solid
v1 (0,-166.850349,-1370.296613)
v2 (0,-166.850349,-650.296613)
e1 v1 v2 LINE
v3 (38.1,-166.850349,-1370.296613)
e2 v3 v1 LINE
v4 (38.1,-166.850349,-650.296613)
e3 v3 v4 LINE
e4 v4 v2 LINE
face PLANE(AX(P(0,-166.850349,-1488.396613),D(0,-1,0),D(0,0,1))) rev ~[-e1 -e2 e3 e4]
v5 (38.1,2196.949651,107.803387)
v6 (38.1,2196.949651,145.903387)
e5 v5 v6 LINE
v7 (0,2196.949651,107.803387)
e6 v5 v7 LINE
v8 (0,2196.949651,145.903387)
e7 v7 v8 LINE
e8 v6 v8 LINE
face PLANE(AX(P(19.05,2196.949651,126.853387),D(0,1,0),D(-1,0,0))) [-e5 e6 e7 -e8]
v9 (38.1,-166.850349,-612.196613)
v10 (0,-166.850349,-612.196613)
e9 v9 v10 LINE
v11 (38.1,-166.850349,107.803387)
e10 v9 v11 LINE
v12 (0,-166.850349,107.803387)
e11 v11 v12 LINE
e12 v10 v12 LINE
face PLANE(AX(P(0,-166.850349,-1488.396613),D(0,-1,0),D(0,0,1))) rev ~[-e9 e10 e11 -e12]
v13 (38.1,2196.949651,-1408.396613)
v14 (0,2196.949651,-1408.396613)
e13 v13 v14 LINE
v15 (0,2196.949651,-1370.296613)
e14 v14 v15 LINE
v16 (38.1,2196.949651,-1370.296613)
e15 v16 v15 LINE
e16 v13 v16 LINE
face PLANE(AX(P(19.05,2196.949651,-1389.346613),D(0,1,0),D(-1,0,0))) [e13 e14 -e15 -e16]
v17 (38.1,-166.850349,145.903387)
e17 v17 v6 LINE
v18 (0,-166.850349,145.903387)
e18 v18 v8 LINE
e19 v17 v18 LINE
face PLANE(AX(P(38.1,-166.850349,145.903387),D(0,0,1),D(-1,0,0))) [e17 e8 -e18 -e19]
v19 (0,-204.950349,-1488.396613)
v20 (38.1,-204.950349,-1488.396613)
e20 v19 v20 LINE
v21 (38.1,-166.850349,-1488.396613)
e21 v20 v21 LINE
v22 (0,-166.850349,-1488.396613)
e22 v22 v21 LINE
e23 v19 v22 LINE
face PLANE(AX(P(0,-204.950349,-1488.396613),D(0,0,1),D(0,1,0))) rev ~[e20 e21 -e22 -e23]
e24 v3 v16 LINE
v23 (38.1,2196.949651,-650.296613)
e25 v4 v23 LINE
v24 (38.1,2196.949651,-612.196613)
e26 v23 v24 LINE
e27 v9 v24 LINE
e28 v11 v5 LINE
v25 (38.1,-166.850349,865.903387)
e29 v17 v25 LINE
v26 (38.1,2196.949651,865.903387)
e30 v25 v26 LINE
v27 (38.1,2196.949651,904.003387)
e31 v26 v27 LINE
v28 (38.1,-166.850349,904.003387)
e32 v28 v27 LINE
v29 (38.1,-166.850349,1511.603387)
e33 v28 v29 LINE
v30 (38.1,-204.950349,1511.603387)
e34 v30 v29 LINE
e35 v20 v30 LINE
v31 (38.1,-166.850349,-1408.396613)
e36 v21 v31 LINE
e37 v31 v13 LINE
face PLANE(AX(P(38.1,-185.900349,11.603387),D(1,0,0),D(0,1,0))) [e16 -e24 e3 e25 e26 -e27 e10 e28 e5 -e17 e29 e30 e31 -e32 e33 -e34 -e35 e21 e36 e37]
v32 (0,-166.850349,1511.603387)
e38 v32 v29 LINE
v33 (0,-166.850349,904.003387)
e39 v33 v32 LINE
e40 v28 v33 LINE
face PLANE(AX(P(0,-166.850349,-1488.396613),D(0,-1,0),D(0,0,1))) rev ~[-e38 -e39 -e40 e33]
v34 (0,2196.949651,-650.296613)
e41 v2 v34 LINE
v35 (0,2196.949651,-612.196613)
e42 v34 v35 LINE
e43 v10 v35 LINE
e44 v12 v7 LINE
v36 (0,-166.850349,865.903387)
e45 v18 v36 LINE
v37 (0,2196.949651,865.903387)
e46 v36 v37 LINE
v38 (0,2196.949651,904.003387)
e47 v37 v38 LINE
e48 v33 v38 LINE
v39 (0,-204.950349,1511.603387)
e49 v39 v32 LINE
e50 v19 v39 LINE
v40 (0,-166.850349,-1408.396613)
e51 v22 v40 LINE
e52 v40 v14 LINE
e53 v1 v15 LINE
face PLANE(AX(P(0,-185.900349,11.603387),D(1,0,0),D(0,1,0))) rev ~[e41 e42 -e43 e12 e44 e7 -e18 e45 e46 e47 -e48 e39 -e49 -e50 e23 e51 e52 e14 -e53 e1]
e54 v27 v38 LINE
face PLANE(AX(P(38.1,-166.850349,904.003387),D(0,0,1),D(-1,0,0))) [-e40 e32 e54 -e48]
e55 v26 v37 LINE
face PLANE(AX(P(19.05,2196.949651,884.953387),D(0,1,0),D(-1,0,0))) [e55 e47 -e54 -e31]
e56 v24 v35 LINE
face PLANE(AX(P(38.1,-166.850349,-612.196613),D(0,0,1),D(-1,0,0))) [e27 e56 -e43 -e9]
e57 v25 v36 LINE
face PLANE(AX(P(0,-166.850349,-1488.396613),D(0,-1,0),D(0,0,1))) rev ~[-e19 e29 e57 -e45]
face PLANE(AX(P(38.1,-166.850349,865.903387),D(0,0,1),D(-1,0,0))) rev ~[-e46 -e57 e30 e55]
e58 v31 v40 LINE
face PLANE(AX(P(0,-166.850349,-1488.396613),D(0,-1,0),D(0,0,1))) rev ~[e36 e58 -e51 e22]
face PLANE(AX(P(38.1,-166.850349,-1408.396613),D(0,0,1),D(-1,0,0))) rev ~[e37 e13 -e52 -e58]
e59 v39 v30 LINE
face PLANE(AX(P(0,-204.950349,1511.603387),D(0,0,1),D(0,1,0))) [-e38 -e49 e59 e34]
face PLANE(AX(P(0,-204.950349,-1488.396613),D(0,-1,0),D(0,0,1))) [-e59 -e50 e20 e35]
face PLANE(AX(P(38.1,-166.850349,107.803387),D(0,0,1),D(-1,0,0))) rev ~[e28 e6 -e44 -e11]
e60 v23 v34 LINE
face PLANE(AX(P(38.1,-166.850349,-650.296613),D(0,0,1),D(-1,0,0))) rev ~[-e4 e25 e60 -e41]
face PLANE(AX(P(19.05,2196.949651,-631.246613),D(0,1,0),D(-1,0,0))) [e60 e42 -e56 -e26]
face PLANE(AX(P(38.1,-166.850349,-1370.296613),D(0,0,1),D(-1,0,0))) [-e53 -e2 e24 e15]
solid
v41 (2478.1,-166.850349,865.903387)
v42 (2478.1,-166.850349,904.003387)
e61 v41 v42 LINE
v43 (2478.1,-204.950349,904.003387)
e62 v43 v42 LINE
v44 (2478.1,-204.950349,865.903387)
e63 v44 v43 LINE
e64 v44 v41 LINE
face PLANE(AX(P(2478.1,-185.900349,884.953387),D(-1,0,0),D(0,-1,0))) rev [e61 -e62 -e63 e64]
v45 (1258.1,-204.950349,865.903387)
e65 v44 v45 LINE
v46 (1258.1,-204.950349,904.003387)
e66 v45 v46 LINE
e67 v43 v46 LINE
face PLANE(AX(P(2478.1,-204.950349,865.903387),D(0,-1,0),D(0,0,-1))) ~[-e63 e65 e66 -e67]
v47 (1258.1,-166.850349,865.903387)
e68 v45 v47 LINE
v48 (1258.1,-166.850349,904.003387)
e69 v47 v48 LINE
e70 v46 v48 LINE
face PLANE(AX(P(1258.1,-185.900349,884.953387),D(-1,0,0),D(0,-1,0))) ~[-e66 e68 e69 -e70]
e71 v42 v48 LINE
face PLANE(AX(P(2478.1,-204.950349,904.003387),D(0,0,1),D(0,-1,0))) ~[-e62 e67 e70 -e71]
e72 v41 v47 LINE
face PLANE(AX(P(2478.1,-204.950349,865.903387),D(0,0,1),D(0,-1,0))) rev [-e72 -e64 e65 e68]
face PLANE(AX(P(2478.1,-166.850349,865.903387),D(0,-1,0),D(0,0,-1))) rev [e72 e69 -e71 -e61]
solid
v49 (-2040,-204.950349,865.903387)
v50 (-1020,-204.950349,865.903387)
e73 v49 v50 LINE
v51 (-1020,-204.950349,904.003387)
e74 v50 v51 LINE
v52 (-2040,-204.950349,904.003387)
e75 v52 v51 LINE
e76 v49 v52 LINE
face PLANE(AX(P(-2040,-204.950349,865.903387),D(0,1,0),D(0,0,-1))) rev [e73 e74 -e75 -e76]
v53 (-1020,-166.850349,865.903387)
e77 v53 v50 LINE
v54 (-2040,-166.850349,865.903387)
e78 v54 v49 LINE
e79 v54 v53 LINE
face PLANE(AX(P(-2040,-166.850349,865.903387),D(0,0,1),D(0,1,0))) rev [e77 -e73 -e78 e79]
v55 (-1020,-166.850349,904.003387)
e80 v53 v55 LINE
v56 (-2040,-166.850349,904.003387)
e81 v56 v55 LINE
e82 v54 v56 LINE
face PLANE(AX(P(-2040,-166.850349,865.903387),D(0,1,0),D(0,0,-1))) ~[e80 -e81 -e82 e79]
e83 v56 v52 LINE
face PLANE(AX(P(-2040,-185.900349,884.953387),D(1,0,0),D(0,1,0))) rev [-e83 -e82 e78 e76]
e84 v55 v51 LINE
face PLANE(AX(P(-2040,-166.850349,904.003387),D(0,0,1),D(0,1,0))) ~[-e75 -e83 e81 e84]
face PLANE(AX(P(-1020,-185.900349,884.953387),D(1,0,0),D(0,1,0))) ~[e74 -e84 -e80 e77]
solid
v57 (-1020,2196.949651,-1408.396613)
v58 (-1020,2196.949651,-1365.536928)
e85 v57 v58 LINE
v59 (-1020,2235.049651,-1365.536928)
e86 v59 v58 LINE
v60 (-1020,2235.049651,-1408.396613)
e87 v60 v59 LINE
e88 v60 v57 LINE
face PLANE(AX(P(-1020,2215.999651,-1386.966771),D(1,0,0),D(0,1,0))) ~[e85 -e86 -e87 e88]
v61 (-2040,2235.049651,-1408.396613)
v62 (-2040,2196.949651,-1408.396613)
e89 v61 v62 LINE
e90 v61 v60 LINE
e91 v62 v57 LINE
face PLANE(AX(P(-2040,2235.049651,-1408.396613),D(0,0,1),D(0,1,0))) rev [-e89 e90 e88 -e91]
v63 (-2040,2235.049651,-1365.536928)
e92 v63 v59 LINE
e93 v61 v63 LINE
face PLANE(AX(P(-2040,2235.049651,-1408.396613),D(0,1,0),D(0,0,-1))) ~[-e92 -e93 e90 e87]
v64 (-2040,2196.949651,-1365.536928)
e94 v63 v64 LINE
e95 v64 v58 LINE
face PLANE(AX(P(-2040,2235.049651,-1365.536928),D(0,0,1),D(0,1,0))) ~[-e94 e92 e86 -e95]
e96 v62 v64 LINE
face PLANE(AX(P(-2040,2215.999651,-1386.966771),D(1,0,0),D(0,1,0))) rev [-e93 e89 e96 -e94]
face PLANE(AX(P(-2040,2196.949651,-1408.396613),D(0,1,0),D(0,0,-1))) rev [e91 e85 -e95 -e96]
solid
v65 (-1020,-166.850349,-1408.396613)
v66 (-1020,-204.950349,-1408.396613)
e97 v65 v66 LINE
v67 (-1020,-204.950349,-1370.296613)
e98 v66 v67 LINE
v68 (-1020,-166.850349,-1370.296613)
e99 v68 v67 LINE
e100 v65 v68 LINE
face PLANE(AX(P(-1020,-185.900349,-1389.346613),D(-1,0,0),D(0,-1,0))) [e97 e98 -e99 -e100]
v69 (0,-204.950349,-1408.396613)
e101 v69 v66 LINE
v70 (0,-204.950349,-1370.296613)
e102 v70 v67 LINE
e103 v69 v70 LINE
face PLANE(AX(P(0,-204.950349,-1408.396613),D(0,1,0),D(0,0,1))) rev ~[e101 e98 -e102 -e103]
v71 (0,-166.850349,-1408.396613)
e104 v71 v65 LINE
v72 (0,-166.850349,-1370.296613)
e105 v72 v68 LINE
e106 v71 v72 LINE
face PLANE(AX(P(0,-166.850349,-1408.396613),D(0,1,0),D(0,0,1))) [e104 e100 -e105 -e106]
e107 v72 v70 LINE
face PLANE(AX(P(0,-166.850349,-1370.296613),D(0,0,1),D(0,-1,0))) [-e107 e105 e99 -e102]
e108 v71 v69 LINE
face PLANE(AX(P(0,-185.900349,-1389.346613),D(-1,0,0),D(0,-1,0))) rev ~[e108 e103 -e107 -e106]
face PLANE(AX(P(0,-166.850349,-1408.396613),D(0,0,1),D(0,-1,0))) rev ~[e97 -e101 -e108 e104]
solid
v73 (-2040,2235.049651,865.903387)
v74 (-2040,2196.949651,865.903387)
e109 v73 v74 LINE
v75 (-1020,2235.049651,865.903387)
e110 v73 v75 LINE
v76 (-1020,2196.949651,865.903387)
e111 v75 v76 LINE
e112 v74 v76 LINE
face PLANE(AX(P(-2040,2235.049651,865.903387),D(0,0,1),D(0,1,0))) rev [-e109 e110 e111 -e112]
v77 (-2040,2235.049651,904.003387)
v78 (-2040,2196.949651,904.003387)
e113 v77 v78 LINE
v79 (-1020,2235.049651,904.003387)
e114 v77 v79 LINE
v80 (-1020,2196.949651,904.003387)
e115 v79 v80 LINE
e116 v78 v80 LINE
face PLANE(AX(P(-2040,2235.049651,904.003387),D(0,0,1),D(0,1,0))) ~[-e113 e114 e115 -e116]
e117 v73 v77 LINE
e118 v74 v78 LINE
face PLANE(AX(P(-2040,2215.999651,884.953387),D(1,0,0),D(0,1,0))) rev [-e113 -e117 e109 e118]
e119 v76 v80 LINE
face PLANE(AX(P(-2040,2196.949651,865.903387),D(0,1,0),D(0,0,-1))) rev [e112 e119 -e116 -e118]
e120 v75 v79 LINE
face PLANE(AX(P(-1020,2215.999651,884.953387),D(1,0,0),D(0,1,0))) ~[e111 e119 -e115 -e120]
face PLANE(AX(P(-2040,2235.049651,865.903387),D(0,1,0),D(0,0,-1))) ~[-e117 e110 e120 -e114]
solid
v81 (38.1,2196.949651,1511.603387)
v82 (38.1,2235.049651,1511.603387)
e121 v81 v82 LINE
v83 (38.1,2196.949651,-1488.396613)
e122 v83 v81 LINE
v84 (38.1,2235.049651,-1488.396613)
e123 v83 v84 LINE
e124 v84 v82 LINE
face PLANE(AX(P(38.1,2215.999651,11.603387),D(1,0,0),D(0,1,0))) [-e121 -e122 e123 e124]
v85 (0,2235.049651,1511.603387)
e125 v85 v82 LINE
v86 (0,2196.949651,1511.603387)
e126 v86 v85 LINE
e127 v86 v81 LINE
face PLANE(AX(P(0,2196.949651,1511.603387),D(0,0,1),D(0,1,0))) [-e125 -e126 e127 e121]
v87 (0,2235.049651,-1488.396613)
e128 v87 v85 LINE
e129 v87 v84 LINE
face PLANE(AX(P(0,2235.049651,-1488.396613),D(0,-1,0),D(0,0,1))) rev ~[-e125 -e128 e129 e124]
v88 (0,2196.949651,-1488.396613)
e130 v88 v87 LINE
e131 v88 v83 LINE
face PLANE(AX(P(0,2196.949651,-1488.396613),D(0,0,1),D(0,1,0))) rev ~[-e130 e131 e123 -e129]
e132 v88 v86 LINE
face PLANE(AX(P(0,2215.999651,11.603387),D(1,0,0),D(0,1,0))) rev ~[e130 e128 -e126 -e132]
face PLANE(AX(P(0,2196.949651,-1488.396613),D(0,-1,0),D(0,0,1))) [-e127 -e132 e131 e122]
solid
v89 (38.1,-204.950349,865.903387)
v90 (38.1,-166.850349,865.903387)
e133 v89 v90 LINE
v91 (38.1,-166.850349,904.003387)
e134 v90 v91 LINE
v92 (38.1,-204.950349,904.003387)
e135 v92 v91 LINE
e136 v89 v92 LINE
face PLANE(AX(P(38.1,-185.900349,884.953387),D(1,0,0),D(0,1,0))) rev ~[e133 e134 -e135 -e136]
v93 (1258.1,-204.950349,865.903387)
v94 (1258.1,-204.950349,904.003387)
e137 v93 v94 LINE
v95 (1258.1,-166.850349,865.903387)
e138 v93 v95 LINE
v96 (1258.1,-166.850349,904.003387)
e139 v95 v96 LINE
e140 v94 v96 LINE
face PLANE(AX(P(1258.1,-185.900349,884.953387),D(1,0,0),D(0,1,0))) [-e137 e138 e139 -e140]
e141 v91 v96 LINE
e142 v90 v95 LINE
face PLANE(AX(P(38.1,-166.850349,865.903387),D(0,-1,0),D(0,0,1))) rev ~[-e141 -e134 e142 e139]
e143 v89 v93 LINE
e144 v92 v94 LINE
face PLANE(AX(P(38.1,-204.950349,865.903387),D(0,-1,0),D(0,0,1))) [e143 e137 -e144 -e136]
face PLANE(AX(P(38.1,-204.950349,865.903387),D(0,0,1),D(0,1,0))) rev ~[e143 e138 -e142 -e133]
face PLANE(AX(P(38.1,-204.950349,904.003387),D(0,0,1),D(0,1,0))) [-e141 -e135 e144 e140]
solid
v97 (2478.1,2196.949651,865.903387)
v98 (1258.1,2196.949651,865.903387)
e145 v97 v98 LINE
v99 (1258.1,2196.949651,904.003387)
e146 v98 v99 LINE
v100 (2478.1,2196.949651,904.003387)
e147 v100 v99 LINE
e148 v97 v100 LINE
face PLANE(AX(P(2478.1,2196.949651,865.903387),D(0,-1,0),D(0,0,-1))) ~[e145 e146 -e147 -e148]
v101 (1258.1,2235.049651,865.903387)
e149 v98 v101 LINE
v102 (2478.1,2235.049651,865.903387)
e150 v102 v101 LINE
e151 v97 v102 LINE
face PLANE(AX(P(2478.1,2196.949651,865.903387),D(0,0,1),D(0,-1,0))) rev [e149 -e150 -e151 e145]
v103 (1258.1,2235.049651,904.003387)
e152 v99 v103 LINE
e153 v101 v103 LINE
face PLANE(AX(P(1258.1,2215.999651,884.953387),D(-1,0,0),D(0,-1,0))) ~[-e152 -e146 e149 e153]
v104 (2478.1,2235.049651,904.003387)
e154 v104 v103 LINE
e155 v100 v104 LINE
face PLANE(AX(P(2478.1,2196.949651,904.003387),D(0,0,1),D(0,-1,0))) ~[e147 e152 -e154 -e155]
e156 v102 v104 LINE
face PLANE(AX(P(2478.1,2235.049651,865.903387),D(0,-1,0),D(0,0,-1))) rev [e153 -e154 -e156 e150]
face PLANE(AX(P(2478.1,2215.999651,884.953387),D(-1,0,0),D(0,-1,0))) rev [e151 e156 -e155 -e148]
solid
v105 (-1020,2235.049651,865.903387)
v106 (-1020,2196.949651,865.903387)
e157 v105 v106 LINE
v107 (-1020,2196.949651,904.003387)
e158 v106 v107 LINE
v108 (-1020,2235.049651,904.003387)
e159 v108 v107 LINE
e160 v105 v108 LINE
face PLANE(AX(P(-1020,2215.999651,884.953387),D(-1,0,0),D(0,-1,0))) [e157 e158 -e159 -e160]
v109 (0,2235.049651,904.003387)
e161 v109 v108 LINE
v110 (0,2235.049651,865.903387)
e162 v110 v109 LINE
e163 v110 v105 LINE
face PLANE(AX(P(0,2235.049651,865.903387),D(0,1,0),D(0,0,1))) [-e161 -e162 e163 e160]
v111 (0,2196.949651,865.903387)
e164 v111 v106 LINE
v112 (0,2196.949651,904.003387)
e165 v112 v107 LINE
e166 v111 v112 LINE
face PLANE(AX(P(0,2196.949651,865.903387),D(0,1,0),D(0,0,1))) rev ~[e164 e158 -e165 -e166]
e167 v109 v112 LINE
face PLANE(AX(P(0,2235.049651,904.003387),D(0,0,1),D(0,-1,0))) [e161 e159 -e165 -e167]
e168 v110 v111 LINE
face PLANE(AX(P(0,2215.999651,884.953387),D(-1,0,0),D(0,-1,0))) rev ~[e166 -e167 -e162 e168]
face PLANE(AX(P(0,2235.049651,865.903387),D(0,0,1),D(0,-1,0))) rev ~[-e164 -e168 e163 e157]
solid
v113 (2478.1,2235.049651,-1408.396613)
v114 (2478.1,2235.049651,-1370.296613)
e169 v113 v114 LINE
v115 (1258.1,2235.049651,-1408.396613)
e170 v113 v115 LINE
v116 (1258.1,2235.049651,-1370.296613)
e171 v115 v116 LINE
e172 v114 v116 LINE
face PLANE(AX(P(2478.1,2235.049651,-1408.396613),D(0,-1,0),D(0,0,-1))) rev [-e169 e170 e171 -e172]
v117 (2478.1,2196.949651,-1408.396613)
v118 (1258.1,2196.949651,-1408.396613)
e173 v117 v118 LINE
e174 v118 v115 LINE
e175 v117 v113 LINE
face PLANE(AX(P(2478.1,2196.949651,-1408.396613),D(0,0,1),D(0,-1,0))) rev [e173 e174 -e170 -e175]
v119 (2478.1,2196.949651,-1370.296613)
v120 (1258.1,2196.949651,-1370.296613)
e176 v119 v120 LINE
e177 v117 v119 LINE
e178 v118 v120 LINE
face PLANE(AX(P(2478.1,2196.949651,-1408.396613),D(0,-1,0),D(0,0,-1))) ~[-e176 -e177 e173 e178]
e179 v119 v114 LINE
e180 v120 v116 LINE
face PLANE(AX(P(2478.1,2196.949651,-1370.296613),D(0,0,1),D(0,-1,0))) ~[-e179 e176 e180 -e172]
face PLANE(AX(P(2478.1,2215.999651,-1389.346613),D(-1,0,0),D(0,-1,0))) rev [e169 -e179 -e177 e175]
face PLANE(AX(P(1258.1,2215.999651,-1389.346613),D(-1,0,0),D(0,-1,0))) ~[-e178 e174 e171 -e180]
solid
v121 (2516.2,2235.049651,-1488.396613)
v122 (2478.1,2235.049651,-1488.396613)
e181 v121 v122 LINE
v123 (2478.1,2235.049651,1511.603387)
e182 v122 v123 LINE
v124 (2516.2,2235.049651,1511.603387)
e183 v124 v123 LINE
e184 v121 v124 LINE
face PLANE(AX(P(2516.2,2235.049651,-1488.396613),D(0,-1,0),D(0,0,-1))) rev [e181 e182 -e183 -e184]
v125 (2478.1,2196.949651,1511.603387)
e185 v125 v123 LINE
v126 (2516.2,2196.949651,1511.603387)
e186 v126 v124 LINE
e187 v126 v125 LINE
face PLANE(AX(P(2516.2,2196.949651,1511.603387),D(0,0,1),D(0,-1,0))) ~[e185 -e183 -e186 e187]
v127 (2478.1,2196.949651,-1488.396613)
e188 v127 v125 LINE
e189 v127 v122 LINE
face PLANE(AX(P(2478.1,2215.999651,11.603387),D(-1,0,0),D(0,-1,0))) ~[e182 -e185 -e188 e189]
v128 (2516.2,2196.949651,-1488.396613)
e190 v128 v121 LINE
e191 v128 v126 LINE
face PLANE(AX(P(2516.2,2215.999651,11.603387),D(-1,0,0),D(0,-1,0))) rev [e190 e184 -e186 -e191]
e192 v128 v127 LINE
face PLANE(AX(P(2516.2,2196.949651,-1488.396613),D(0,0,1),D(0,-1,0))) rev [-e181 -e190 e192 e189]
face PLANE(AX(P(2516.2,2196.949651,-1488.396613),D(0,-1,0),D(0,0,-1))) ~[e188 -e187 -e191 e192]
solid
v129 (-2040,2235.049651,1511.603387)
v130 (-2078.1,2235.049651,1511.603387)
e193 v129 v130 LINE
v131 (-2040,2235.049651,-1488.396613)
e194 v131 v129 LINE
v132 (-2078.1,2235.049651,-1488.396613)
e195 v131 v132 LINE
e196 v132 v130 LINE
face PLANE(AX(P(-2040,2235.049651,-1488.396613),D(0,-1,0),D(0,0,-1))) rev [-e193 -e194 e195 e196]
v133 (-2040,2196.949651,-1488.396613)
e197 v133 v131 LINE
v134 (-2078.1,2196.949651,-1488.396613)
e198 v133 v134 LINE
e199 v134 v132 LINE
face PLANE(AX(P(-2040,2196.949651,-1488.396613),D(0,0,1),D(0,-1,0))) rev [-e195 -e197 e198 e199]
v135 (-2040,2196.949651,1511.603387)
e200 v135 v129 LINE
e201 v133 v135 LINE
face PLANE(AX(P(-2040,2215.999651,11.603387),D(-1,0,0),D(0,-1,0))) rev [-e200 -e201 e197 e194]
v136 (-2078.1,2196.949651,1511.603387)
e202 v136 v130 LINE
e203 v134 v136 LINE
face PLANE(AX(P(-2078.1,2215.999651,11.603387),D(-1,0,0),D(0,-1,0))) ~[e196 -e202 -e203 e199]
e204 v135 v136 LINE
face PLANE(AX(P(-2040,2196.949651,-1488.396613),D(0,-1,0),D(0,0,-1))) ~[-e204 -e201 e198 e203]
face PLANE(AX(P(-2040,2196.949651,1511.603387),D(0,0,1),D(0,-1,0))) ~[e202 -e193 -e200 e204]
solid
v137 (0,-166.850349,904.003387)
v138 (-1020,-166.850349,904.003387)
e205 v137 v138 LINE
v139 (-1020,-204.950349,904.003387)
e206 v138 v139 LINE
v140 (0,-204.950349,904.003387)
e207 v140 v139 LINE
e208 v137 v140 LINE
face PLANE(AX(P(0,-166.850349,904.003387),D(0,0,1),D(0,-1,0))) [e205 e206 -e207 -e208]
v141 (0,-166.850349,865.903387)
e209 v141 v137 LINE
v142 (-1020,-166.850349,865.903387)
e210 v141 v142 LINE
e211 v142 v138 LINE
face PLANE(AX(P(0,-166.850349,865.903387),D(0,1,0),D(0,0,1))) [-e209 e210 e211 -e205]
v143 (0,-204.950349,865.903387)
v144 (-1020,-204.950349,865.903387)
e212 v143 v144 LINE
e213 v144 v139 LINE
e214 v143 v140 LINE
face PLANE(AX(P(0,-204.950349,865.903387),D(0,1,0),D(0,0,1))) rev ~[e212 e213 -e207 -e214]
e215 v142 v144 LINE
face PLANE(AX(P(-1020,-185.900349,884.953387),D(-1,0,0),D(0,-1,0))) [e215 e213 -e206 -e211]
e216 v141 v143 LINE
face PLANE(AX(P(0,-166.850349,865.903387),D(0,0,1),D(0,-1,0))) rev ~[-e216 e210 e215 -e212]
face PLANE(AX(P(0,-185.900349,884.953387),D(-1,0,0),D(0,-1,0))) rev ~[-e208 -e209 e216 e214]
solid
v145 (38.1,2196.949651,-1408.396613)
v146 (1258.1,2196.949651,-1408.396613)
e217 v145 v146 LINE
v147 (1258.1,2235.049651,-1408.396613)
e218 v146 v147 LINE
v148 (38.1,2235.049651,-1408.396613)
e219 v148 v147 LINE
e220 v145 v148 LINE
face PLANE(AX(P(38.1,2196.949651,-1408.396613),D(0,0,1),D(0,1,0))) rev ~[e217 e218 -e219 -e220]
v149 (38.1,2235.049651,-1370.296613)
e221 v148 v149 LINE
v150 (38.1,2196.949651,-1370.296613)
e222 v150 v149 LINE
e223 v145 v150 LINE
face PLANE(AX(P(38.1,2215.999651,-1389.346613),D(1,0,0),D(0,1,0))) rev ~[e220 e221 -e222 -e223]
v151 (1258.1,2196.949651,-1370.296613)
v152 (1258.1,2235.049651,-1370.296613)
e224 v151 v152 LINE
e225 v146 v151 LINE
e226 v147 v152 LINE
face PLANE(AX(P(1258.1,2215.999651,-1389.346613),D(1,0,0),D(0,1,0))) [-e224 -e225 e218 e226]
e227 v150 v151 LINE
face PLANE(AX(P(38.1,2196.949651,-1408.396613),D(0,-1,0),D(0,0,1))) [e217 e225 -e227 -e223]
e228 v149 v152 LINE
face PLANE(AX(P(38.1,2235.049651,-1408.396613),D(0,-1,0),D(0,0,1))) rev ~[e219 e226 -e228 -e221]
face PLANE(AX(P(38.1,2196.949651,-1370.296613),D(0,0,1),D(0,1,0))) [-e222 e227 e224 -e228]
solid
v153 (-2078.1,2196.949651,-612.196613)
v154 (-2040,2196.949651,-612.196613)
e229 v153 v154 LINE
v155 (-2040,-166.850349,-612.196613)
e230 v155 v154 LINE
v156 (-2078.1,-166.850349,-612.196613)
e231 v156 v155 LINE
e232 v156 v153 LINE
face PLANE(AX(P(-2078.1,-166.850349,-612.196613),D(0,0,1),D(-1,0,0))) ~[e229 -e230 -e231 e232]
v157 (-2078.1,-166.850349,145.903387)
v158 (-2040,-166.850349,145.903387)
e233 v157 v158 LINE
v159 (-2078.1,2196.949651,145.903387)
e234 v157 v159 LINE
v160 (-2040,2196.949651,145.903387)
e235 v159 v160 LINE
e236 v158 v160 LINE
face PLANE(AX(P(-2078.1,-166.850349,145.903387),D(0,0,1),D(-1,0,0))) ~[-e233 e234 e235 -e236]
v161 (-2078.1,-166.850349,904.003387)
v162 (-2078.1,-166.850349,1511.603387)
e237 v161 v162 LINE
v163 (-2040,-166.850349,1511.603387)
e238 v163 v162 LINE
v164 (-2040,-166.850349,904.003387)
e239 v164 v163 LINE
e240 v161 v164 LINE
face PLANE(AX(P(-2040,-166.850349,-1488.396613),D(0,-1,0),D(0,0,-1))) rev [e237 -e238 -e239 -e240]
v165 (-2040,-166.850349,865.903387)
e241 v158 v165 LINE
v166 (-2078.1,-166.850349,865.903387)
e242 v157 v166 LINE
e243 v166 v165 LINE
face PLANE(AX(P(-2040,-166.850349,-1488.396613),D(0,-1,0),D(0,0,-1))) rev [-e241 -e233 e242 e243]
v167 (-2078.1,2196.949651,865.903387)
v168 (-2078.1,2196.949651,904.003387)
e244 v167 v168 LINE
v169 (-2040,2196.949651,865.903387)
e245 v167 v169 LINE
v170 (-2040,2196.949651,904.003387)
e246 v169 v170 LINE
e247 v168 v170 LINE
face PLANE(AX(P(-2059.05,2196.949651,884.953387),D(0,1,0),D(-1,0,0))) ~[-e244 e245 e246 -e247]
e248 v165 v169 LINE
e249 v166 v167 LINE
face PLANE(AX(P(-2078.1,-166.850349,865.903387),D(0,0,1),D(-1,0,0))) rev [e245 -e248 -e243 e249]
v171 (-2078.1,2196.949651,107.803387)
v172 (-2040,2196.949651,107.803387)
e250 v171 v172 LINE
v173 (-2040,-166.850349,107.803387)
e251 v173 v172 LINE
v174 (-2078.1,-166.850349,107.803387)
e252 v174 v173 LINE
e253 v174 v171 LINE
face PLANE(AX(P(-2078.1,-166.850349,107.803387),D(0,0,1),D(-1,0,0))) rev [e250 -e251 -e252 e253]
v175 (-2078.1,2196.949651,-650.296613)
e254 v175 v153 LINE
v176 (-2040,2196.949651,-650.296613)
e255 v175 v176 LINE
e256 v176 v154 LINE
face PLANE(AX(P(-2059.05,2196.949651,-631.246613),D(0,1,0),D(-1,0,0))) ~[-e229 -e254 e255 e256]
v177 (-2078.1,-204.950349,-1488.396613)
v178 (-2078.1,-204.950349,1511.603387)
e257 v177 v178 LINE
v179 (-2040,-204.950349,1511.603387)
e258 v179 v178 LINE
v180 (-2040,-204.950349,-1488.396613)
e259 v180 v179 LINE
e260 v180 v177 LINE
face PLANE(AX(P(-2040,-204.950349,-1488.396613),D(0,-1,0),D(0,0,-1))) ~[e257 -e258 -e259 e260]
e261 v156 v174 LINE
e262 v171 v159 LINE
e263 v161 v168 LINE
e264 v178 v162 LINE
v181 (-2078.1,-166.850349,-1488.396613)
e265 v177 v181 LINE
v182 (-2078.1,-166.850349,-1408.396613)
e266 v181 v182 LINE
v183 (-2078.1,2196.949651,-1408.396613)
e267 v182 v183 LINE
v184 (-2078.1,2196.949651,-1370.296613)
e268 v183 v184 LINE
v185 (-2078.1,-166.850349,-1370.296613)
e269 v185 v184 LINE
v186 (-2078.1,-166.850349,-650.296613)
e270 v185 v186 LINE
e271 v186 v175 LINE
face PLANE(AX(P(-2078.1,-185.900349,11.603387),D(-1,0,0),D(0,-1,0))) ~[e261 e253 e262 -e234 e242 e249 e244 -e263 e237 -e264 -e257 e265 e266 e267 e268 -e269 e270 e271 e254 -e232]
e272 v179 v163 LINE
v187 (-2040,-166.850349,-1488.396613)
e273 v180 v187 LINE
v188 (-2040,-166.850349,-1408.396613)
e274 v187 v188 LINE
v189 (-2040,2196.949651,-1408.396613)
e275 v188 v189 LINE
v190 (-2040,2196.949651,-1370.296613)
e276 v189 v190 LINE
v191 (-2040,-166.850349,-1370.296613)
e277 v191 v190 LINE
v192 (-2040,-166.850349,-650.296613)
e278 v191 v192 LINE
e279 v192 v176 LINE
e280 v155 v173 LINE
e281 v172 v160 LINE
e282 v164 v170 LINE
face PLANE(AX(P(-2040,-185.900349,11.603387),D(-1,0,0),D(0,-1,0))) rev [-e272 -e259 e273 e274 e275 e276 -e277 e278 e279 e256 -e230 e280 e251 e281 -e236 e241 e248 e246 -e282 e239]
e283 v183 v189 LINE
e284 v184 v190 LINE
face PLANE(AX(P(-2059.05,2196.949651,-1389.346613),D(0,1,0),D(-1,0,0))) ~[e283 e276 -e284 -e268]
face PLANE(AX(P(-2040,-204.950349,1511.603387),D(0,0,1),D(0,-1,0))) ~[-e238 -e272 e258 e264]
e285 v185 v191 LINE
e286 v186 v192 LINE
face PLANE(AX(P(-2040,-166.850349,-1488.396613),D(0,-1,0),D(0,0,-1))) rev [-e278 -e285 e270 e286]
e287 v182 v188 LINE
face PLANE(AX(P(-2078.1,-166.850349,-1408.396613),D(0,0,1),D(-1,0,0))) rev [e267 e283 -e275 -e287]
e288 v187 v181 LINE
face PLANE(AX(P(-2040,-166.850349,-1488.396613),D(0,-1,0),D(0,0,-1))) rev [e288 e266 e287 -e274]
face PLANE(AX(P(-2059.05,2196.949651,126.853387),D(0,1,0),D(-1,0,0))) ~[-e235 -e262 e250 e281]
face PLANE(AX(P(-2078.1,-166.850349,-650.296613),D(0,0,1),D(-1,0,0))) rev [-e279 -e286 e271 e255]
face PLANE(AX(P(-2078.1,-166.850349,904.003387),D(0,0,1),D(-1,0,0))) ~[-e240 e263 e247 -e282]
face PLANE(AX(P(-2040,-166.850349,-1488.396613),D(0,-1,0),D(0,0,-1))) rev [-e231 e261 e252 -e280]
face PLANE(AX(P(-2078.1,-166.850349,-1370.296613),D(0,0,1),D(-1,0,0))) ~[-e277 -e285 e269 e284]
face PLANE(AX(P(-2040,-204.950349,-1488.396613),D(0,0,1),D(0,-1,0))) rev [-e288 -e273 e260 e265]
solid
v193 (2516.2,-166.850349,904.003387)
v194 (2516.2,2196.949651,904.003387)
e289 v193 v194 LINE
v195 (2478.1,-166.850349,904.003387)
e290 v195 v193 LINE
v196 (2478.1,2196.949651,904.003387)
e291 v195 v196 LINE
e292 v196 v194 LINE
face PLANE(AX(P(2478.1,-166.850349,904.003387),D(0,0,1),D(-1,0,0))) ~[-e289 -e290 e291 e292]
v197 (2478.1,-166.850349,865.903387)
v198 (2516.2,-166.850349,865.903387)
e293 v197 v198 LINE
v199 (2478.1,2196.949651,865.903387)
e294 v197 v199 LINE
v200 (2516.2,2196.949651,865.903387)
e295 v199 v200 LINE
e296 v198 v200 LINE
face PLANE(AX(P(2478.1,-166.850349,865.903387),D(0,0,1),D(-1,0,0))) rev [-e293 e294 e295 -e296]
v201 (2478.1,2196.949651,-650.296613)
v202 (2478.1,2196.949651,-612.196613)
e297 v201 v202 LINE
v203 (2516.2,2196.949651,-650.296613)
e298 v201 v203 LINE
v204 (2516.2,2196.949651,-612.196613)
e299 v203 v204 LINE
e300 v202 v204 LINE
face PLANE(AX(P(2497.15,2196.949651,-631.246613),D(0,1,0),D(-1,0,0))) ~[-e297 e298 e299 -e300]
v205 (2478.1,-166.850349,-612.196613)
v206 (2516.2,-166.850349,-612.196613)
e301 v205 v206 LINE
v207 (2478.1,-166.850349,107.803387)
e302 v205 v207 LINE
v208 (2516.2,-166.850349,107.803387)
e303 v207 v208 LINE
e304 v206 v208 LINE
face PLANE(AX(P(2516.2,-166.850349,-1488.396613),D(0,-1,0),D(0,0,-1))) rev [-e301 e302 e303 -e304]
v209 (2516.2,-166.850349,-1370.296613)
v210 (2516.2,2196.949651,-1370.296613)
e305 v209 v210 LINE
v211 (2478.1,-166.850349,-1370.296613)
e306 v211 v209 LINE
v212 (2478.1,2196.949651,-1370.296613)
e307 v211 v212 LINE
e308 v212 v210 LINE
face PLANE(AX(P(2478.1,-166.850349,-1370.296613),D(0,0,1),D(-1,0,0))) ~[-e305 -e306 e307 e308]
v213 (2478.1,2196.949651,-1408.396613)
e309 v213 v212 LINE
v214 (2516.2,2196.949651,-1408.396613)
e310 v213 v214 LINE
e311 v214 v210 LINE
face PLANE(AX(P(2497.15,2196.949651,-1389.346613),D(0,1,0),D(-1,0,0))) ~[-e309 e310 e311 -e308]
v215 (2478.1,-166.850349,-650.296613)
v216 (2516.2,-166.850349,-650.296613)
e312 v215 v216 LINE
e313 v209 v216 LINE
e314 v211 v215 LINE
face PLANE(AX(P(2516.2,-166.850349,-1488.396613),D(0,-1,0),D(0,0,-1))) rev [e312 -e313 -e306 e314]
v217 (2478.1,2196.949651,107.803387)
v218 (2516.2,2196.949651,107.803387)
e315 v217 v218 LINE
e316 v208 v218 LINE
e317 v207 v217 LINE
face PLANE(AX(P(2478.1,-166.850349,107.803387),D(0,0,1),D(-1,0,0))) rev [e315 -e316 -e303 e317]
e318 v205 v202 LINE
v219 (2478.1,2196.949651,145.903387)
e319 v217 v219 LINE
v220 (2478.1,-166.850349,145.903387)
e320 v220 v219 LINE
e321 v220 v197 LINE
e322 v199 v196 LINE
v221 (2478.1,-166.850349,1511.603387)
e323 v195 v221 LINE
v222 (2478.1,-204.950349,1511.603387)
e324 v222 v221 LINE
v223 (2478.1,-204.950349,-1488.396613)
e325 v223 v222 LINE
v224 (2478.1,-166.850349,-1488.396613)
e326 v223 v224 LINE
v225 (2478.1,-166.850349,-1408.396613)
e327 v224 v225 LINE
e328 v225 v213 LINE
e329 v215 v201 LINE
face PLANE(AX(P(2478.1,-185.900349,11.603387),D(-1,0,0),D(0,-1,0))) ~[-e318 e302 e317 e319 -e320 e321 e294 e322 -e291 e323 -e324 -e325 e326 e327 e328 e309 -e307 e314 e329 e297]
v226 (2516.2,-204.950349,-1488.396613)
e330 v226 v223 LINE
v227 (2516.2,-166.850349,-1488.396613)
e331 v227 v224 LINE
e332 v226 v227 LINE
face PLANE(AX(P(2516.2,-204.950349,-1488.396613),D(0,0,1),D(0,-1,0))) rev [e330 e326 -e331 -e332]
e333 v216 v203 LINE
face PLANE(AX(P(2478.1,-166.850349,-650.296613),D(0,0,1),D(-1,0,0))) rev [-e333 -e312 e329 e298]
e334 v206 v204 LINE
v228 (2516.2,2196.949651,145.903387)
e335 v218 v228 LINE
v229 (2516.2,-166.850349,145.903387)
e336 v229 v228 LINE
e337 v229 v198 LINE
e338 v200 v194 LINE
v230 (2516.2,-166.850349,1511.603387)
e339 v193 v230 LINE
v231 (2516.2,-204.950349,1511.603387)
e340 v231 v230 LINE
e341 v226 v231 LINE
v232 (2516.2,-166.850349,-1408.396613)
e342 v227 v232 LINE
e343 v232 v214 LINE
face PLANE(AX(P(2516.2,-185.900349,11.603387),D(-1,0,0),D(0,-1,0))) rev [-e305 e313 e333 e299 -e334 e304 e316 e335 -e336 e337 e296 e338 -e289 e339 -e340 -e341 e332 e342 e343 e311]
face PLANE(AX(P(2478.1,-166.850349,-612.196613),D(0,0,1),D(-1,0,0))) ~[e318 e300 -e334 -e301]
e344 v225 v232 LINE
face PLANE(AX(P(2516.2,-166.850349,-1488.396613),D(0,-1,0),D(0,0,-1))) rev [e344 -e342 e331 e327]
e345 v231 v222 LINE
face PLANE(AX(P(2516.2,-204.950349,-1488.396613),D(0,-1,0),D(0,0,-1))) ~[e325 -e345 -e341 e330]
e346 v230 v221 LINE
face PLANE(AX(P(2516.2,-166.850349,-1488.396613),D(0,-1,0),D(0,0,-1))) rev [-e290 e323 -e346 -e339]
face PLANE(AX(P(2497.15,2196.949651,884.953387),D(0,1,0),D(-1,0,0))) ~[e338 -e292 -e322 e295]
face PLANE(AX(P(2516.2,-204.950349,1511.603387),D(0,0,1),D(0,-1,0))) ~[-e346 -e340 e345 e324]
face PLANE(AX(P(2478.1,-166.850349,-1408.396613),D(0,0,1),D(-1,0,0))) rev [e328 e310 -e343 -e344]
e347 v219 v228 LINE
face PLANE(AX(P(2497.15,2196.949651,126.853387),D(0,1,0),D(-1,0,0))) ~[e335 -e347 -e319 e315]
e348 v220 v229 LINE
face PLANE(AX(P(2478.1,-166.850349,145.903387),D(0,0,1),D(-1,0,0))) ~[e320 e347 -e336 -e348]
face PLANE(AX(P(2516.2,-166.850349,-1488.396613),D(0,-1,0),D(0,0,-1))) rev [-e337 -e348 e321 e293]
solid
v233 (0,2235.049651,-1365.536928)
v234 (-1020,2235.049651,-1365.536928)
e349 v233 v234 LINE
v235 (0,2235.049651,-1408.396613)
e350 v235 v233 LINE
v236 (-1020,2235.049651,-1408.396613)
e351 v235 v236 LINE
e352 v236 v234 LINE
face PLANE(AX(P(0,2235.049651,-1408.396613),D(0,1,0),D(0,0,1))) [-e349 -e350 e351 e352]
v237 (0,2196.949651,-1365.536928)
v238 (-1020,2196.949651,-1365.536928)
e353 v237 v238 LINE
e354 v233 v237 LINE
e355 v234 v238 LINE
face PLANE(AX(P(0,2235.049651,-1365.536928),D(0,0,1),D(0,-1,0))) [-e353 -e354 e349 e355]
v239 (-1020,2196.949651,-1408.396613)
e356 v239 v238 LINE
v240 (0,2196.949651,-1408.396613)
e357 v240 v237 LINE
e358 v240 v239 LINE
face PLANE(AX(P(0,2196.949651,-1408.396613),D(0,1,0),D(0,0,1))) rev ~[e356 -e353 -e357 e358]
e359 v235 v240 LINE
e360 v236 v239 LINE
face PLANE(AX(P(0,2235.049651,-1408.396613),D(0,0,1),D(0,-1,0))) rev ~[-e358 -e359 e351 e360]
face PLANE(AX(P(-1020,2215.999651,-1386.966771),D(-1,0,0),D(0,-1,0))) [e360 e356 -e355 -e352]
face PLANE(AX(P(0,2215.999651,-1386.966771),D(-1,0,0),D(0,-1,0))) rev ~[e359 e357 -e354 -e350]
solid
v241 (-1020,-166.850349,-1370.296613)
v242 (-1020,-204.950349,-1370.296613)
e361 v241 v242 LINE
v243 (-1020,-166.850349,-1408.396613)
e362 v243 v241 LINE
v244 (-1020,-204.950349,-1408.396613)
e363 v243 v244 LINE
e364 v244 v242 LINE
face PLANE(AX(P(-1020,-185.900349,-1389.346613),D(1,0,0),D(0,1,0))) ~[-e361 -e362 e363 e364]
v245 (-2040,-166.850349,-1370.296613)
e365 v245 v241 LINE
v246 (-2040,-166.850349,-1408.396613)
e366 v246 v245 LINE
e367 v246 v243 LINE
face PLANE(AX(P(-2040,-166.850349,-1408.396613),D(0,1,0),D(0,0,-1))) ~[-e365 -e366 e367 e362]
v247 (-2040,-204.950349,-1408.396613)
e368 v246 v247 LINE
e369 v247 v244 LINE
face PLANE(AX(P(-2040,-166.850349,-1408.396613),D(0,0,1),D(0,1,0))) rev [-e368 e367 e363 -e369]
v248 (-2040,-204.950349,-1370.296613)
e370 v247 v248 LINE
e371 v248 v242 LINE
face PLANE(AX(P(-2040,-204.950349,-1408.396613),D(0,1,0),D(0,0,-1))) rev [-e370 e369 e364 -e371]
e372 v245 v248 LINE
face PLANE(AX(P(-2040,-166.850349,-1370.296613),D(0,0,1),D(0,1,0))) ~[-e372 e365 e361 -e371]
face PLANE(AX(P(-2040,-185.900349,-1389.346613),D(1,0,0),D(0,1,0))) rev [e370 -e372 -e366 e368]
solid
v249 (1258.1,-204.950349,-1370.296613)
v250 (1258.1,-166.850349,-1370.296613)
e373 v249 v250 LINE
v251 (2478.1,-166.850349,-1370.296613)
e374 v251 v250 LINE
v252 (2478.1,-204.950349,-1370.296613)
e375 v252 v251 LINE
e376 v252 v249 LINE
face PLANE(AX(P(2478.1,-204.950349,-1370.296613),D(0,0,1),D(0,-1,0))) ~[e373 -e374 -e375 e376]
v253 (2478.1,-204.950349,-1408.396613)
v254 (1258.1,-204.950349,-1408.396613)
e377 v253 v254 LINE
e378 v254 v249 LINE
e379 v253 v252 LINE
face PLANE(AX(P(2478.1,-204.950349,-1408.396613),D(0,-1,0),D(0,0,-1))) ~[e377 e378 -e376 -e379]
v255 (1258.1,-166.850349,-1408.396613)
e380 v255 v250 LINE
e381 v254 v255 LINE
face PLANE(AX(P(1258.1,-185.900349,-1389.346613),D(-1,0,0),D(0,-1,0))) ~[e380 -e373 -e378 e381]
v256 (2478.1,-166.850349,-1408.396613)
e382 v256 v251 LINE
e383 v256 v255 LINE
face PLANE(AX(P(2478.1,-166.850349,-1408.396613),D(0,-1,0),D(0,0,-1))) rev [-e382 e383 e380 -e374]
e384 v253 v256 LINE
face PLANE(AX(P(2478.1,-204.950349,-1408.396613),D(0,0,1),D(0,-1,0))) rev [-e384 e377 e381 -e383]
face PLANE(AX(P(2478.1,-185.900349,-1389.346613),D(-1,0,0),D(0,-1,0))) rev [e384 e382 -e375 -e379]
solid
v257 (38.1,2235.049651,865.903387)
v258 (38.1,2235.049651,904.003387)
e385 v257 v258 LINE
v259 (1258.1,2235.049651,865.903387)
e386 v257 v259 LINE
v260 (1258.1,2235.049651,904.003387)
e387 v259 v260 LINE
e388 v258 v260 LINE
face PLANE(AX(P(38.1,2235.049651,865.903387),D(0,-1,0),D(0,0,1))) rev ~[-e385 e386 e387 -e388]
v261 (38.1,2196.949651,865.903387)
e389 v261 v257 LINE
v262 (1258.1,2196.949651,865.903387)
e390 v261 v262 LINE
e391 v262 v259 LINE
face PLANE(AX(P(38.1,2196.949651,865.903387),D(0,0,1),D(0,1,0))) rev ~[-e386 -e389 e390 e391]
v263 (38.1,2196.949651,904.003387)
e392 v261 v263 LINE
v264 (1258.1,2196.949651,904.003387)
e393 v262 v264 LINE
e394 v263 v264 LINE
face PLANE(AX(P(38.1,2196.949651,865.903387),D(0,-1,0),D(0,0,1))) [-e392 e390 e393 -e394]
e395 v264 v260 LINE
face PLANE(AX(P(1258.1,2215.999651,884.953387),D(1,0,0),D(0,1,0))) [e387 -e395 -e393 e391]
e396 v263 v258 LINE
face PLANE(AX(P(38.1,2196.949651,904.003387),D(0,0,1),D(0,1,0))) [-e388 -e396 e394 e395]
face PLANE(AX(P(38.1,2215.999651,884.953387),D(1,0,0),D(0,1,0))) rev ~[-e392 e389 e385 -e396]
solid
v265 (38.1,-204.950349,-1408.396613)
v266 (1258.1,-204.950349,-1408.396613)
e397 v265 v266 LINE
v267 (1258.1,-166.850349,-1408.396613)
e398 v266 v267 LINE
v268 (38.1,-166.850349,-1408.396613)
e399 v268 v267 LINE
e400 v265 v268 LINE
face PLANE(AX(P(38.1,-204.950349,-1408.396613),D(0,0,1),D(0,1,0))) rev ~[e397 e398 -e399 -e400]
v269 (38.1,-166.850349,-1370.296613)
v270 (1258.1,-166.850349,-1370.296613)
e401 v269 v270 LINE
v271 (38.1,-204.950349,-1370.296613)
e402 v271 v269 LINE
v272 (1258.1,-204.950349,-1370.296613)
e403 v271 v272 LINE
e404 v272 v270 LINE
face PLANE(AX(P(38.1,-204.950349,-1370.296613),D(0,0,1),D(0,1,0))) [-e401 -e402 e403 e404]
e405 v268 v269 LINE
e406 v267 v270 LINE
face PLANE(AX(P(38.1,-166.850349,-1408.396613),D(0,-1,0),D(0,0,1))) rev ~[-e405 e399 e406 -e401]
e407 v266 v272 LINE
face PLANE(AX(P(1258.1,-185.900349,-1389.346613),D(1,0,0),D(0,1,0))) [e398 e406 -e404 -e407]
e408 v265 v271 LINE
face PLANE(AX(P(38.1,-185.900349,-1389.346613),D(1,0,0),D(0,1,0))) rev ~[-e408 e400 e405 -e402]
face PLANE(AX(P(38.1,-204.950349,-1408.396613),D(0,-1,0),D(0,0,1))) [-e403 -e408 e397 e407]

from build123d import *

# Parameters (mm, degrees)
F0_W      = 38.1
F0_H      = 3000
F1_DEPTH  = 38.1
F2_W      = 38.1
F2_H      = 38.1
F3_DEPTH  = 2363.8
F4_W      = 38.1
F4_H      = 38.1
F5_DEPTH  = 2363.8
F6_W      = 38.1
F6_H      = 38.1
F7_DEPTH  = 2363.8
F8_W      = 38.1
F8_H      = 38.1
F9_DEPTH  = 1020
F8_H_2    = 42.8596847504
F11_W     = 38.1
F11_H     = 38.1
F12_DEPTH = 1220


with BuildPart() as f1:
    # F0 (on Right) → F1 (new body)
    with BuildSketch(Plane.YZ):
        with Locations((-185.9003488964, 11.6033870727)):
            Rectangle(F0_W, F0_H)
    extrude(amount=F1_DEPTH)

    # F2 (on face) → F3 (join)
    with BuildSketch(Plane(origin=(0, -166.8503488964, 0), x_dir=(-1, 0, 0), z_dir=(0, 1, 0))):
        with Locations((-19.05, -1389.3466129273)):
            Rectangle(F2_W, F2_H)
    extrude(amount=F3_DEPTH)

    # F4 (on face) → F5 (join)
    with BuildSketch(Plane(origin=(0, -166.8503488964, 0), x_dir=(-1, 0, 0), z_dir=(0, 1, 0))):
        with Locations((-19.05, -631.2466129273)):
            Rectangle(F4_W, F4_H)
    extrude(amount=F5_DEPTH)

    # F6 (on face) → F7 (join)
    with BuildSketch(Plane(origin=(0, -166.8503488964, 0), x_dir=(-1, 0, 0), z_dir=(0, 1, 0))):
        with Locations((-19.05, 126.8533870727)):
            Rectangle(F6_W, F6_H)
        with Locations((-19.05, 884.9533870727)):
            Rectangle(F6_W, F6_H)
    extrude(amount=F7_DEPTH)


with BuildPart() as f1b:
    # F0 (on Right) → F1, piece 2 (new body)
    with BuildSketch(Plane.YZ):
        with Locations((2215.9996511036, 11.6033870727)):
            Rectangle(F0_W, F0_H)
    extrude(amount=F1_DEPTH)


with BuildPart() as f9:
    # F8 (on face) → F9 (new body)
    with BuildSketch(Plane(origin=(0, 0, 0), x_dir=(0, -1, 0), z_dir=(-1, 0, 0))):
        with Locations((185.9003488964, 884.9533870727)):
            Rectangle(F8_W, F8_H)
    extrude(amount=F9_DEPTH)


with BuildPart() as f9b:
    # F8 (on face) → F9, piece 2 (new body)
    with BuildSketch(Plane(origin=(0, 0, 0), x_dir=(0, -1, 0), z_dir=(-1, 0, 0))):
        with Locations((-2215.9996511036, 884.9533870727)):
            Rectangle(F8_W, F8_H)
    extrude(amount=F9_DEPTH)


with BuildPart() as f9c:
    # F8 (on face) → F9, piece 3 (new body)
    with BuildSketch(Plane(origin=(0, 0, 0), x_dir=(0, -1, 0), z_dir=(-1, 0, 0))):
        with Locations((-2215.9996511036, -1386.9667705521)):
            Rectangle(F8_W, F8_H_2)
    extrude(amount=F9_DEPTH)


with BuildPart() as f9d:
    # F8 (on face) → F9, piece 4 (new body)
    with BuildSketch(Plane(origin=(0, 0, 0), x_dir=(0, -1, 0), z_dir=(-1, 0, 0))):
        with Locations((185.9003488964, -1389.3466129273)):
            Rectangle(F8_W, F8_H)
    extrude(amount=F9_DEPTH)


with BuildPart() as f10_1:
    # F10: instance of F1
    add(f1.part.mirror(Plane(origin=(-1020, 2215.9996511036, 884.9533870727), x_dir=(0, -1, 0), z_dir=(-1, 0, 0))))


with BuildPart() as f10_2:
    # F10: instance of F1b
    add(f1b.part.mirror(Plane(origin=(-1020, 2215.9996511036, 884.9533870727), x_dir=(0, -1, 0), z_dir=(-1, 0, 0))))


with BuildPart() as f10_3:
    # F10: instance of F9
    add(f9.part.mirror(Plane(origin=(-1020, 2215.9996511036, 884.9533870727), x_dir=(0, -1, 0), z_dir=(-1, 0, 0))))


with BuildPart() as f10_4:
    # F10: instance of F9b
    add(f9b.part.mirror(Plane(origin=(-1020, 2215.9996511036, 884.9533870727), x_dir=(0, -1, 0), z_dir=(-1, 0, 0))))


with BuildPart() as f10_5:
    # F10: instance of F9c
    add(f9c.part.mirror(Plane(origin=(-1020, 2215.9996511036, 884.9533870727), x_dir=(0, -1, 0), z_dir=(-1, 0, 0))))


with BuildPart() as f10_6:
    # F10: instance of F9d
    add(f9d.part.mirror(Plane(origin=(-1020, 2215.9996511036, 884.9533870727), x_dir=(0, -1, 0), z_dir=(-1, 0, 0))))


with BuildPart() as f12:
    # F11 (on face) → F12 (new body)
    with BuildSketch(Plane.YZ.offset(38.1)):
        with Locations((-185.9003488964, 884.9533870727)):
            Rectangle(F11_W, F11_H)
    extrude(amount=F12_DEPTH)


with BuildPart() as f12b:
    # F11 (on face) → F12, piece 2 (new body)
    with BuildSketch(Plane.YZ.offset(38.1)):
        with Locations((2215.9996511036, 884.9533870727)):
            Rectangle(F11_W, F11_H)
    extrude(amount=F12_DEPTH)


with BuildPart() as f12c:
    # F11 (on face) → F12, piece 3 (new body)
    with BuildSketch(Plane.YZ.offset(38.1)):
        with Locations((-185.9003488964, -1389.3466129273)):
            Rectangle(F11_W, F11_H)
    extrude(amount=F12_DEPTH)


with BuildPart() as f12d:
    # F11 (on face) → F12, piece 4 (new body)
    with BuildSketch(Plane.YZ.offset(38.1)):
        with Locations((2215.9996511036, -1389.3466129273)):
            Rectangle(F11_W, F11_H)
    extrude(amount=F12_DEPTH)


with BuildPart() as f13_1:
    # F13: instance of F1
    add(f1.part.mirror(Plane(origin=(1258.1, -185.9003488964, 884.9533870727), x_dir=(0, 1, 0), z_dir=(1, 0, 0))))


with BuildPart() as f13_2:
    # F13: instance of F1b
    add(f1b.part.mirror(Plane(origin=(1258.1, -185.9003488964, 884.9533870727), x_dir=(0, 1, 0), z_dir=(1, 0, 0))))


with BuildPart() as f13_3:
    # F13: instance of F12d
    add(f12d.part.mirror(Plane(origin=(1258.1, -185.9003488964, 884.9533870727), x_dir=(0, 1, 0), z_dir=(1, 0, 0))))


with BuildPart() as f13_4:
    # F13: instance of F12c
    add(f12c.part.mirror(Plane(origin=(1258.1, -185.9003488964, 884.9533870727), x_dir=(0, 1, 0), z_dir=(1, 0, 0))))


with BuildPart() as f13_5:
    # F13: instance of F12b
    add(f12b.part.mirror(Plane(origin=(1258.1, -185.9003488964, 884.9533870727), x_dir=(0, 1, 0), z_dir=(1, 0, 0))))


with BuildPart() as f13_6:
    # F13: instance of F12
    add(f12.part.mirror(Plane(origin=(1258.1, -185.9003488964, 884.9533870727), x_dir=(0, 1, 0), z_dir=(1, 0, 0))))


solid = Compound([f1.part, f1b.part, f9.part, f9b.part, f9c.part, f9d.part, f10_1.part, f10_2.part, f10_3.part, f10_4.part, f10_5.part, f10_6.part, f12.part, f12b.part, f12c.part, f12d.part, f13_1.part, f13_2.part, f13_3.part, f13_4.part, f13_5.part, f13_6.part])
